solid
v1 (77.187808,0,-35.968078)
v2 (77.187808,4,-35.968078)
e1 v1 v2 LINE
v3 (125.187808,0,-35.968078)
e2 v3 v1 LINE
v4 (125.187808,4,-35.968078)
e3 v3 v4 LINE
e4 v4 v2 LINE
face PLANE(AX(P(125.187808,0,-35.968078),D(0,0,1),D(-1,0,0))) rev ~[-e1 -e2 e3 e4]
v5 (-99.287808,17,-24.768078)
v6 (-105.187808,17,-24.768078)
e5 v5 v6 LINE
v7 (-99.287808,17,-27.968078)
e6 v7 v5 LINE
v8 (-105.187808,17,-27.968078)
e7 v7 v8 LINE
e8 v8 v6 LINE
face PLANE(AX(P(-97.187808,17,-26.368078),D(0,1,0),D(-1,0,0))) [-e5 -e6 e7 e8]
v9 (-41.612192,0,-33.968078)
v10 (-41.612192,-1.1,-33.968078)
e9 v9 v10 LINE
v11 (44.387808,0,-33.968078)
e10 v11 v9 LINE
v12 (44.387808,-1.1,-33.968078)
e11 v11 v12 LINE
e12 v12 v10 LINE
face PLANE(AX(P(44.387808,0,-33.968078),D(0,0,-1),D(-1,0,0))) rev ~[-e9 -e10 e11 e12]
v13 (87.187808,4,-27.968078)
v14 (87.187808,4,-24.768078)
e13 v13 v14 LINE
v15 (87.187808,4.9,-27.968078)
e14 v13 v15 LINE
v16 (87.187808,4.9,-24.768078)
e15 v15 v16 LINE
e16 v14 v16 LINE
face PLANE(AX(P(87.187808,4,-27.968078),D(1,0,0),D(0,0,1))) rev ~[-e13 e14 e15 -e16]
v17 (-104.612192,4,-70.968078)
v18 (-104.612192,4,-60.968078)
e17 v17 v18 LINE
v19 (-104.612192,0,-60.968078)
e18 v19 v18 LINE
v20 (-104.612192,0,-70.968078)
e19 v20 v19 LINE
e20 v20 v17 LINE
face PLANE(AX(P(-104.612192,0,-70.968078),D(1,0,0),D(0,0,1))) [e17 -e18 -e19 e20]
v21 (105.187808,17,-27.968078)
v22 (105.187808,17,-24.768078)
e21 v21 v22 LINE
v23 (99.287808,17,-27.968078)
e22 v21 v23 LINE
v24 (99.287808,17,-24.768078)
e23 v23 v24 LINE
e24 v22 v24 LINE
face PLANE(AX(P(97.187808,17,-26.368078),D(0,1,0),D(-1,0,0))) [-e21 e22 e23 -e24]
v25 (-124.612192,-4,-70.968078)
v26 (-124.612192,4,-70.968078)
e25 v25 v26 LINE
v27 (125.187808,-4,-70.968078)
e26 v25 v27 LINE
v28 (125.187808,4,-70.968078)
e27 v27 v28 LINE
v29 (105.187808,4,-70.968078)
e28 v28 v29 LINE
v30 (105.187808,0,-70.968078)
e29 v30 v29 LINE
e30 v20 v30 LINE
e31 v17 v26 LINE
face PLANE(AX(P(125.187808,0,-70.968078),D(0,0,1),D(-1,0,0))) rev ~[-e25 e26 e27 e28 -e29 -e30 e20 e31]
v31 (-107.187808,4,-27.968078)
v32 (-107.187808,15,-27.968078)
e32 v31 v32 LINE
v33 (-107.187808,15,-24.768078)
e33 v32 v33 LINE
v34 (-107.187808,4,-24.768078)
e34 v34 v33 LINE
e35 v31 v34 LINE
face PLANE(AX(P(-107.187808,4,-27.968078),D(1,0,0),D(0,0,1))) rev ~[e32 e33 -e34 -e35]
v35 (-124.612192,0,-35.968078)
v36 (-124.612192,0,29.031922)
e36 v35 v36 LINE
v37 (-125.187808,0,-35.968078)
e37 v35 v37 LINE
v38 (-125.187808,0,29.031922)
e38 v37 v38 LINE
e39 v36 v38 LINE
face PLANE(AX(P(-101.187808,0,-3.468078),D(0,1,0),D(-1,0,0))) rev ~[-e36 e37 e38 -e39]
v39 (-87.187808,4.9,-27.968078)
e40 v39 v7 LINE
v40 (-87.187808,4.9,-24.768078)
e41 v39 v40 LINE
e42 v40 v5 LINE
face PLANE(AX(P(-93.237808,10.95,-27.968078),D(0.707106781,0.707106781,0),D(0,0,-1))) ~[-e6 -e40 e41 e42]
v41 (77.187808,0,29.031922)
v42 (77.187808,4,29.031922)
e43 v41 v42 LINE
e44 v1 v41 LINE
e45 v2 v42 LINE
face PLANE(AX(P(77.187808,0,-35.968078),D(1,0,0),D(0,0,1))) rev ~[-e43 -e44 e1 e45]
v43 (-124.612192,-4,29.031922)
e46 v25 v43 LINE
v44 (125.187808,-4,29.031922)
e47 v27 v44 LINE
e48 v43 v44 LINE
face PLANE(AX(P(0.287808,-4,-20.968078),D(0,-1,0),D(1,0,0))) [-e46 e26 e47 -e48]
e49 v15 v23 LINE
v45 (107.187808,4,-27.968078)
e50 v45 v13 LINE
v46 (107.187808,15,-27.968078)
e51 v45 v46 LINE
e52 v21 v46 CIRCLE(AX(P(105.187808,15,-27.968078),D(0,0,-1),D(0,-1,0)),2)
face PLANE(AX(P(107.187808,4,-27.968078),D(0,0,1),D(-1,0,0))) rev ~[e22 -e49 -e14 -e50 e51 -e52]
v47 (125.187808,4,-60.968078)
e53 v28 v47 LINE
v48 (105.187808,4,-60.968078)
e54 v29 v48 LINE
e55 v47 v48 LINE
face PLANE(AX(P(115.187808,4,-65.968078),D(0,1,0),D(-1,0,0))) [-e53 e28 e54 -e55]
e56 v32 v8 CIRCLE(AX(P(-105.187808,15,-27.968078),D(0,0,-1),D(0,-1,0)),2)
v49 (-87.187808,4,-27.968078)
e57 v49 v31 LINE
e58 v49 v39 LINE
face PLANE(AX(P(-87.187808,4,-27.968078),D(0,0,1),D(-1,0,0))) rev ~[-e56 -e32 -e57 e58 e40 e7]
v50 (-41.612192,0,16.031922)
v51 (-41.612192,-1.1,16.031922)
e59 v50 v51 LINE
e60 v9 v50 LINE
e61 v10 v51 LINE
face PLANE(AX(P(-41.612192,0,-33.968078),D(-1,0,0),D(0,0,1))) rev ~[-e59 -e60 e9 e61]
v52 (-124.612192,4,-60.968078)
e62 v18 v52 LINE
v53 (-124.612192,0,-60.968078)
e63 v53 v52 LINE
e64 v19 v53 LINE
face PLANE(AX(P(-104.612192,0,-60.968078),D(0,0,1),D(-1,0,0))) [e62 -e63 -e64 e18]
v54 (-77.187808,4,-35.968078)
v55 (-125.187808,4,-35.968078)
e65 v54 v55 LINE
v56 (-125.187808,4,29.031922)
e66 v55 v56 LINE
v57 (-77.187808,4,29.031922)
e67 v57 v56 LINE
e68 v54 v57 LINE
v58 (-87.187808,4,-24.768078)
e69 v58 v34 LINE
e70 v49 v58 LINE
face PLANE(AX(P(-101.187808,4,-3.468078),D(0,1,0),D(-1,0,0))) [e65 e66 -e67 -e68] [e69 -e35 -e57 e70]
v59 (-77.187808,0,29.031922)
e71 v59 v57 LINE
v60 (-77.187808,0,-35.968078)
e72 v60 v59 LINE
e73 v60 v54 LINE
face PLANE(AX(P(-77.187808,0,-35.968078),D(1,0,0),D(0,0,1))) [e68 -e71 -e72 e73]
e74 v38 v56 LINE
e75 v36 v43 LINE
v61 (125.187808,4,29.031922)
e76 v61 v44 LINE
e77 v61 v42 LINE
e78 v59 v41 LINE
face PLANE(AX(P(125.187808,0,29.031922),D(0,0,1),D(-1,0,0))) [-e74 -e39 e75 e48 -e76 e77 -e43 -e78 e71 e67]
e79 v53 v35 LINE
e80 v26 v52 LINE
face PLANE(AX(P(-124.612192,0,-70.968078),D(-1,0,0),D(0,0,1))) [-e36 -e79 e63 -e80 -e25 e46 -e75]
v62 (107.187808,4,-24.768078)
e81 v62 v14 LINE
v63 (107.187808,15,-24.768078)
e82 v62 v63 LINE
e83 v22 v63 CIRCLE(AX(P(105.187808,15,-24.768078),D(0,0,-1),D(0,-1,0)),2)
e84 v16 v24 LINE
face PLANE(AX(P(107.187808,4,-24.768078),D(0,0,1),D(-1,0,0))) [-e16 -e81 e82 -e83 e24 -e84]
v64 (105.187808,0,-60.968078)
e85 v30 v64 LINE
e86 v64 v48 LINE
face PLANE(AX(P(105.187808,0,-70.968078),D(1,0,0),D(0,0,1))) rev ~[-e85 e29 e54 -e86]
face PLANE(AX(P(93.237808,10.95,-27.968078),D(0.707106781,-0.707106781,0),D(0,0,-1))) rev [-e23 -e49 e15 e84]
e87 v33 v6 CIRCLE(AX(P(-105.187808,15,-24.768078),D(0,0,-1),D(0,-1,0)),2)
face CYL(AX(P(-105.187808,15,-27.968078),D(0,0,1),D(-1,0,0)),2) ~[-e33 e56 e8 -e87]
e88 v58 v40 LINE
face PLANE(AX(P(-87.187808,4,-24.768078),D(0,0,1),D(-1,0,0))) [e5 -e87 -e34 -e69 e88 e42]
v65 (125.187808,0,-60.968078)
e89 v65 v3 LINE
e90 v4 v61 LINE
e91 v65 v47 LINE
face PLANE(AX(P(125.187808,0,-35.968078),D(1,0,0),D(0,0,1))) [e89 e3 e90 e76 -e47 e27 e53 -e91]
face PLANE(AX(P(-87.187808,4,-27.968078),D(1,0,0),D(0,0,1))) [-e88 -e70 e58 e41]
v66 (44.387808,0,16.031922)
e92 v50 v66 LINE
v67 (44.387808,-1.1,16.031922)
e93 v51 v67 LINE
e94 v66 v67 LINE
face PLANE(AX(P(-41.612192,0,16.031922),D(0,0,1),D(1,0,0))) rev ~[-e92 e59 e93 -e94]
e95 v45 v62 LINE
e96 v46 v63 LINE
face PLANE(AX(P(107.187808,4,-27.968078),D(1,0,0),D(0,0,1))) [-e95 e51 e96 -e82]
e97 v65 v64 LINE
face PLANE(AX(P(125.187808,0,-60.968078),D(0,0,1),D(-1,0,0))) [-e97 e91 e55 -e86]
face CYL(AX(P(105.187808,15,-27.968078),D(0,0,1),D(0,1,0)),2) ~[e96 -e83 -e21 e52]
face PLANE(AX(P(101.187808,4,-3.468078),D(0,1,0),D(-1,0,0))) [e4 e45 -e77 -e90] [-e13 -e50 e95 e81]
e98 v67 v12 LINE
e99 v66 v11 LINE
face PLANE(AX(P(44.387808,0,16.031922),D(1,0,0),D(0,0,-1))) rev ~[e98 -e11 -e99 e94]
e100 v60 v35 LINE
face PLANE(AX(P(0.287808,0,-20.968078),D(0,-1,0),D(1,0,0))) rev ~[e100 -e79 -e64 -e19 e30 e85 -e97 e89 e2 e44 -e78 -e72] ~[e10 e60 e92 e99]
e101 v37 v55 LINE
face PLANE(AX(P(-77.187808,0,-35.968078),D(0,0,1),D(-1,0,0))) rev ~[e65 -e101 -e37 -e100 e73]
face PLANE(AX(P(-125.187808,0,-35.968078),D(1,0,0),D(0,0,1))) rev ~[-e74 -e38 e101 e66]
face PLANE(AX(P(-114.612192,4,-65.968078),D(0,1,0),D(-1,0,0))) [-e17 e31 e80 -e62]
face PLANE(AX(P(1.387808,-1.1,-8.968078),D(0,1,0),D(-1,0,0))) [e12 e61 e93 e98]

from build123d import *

# Parameters (mm, degrees)
F0_W      = 249.8
F0_H      = 100
F1_DEPTH  = 4
F4_W      = 20
F4_H      = 10
F5_DEPTH  = 4
F6_W      = 48
F6_H      = 65
F7_DEPTH  = 4
F8_W      = 20
F8_H      = 10
F9_DEPTH  = 4
F10_DEPTH = 1.1
F11_W     = 20
F11_H     = 3.2
F12_DEPTH = 13
F13_SIZE  = 12.1
F14_R     = 2


# Not quite as in the source:
# - a feature names something its author has since deleted; it is built from what else it names


with BuildPart() as f1:
    # F0 (on Front) → F1 (new body)
    with BuildSketch(Plane.XZ):
        with Locations((0.2878084779, -20.9680776408)):
            Rectangle(F0_W, F0_H)
    extrude(amount=F1_DEPTH)

    # F4 (on face) → F5 (join)
    with BuildSketch(Plane(origin=(0, 0, 0), x_dir=(-1, 0, 0), z_dir=(0, 1, 0))):
        with Locations((-115.1878084779, -65.9680776408)):
            Rectangle(F4_W, F4_H)
        with Locations((114.6121915221, -65.9680776408)):
            Rectangle(F4_W, F4_H)
    extrude(amount=F5_DEPTH)

    # F6 (on face) → F7 (join)
    with BuildSketch(Plane(origin=(0, 0, 0), x_dir=(-1, 0, 0), z_dir=(0, 1, 0))):
        with Locations((-101.1878084779, -3.4680776408)):
            Rectangle(F6_W, F6_H)
        with Locations((101.1878084779, -3.4680776408)):
            Rectangle(F6_W, F6_H)
    extrude(amount=F7_DEPTH)

    # F8 (on face) → F9 (join)
    with BuildSketch(Plane(origin=(0, 0, 0), x_dir=(-1, 0, 0), z_dir=(0, 1, 0))):
        with Locations((114.6121915221, -65.9680776408)):
            Rectangle(F8_W, F8_H)
    extrude(amount=F9_DEPTH)

    # F2 (on face) → F10 (cut)
    with BuildSketch(Plane(origin=(0, 0, 0), x_dir=(-1, 0, 0), z_dir=(0, 1, 0))):
        Polygon((41.6121915221, 16.0319223592), (-44.3878084779, 16.0319223592), (-44.3878084779, 6.0319223592), (-44.3878084779, -23.9680776408), (-44.3878084779, -33.9680776408), (41.6121915221, -33.9680776408), (41.6121915221, 6.0319223592), align=None)
    extrude(amount=-F10_DEPTH, mode=Mode.SUBTRACT)

    # F11 (on face) → F12 (join)
    with BuildSketch(Plane(origin=(0, 4, 0), x_dir=(-1, 0, 0), z_dir=(0, 1, 0))):
        with Locations((-97.1878084779, -26.3680776408)):
            Rectangle(F11_W, F11_H)
        with Locations((97.1878084779, -26.3680776408)):
            Rectangle(F11_W, F11_H)
    extrude(amount=F12_DEPTH)

    # F13
    f13_edges = [f1.edges().sort_by_distance(p)[0] for p in [
        (87.187808, 17, -26.368078),
        (-87.187808, 17, -26.368078),
    ]]
    chamfer(f13_edges, length=F13_SIZE)

    # F14
    f14_edges = [f1.edges().sort_by_distance(p)[0] for p in [
        (107.187808, 17, -26.368078),
        (-107.187808, 17, -26.368078),
    ]]
    fillet(f14_edges, radius=F14_R)


solid = f1.part
